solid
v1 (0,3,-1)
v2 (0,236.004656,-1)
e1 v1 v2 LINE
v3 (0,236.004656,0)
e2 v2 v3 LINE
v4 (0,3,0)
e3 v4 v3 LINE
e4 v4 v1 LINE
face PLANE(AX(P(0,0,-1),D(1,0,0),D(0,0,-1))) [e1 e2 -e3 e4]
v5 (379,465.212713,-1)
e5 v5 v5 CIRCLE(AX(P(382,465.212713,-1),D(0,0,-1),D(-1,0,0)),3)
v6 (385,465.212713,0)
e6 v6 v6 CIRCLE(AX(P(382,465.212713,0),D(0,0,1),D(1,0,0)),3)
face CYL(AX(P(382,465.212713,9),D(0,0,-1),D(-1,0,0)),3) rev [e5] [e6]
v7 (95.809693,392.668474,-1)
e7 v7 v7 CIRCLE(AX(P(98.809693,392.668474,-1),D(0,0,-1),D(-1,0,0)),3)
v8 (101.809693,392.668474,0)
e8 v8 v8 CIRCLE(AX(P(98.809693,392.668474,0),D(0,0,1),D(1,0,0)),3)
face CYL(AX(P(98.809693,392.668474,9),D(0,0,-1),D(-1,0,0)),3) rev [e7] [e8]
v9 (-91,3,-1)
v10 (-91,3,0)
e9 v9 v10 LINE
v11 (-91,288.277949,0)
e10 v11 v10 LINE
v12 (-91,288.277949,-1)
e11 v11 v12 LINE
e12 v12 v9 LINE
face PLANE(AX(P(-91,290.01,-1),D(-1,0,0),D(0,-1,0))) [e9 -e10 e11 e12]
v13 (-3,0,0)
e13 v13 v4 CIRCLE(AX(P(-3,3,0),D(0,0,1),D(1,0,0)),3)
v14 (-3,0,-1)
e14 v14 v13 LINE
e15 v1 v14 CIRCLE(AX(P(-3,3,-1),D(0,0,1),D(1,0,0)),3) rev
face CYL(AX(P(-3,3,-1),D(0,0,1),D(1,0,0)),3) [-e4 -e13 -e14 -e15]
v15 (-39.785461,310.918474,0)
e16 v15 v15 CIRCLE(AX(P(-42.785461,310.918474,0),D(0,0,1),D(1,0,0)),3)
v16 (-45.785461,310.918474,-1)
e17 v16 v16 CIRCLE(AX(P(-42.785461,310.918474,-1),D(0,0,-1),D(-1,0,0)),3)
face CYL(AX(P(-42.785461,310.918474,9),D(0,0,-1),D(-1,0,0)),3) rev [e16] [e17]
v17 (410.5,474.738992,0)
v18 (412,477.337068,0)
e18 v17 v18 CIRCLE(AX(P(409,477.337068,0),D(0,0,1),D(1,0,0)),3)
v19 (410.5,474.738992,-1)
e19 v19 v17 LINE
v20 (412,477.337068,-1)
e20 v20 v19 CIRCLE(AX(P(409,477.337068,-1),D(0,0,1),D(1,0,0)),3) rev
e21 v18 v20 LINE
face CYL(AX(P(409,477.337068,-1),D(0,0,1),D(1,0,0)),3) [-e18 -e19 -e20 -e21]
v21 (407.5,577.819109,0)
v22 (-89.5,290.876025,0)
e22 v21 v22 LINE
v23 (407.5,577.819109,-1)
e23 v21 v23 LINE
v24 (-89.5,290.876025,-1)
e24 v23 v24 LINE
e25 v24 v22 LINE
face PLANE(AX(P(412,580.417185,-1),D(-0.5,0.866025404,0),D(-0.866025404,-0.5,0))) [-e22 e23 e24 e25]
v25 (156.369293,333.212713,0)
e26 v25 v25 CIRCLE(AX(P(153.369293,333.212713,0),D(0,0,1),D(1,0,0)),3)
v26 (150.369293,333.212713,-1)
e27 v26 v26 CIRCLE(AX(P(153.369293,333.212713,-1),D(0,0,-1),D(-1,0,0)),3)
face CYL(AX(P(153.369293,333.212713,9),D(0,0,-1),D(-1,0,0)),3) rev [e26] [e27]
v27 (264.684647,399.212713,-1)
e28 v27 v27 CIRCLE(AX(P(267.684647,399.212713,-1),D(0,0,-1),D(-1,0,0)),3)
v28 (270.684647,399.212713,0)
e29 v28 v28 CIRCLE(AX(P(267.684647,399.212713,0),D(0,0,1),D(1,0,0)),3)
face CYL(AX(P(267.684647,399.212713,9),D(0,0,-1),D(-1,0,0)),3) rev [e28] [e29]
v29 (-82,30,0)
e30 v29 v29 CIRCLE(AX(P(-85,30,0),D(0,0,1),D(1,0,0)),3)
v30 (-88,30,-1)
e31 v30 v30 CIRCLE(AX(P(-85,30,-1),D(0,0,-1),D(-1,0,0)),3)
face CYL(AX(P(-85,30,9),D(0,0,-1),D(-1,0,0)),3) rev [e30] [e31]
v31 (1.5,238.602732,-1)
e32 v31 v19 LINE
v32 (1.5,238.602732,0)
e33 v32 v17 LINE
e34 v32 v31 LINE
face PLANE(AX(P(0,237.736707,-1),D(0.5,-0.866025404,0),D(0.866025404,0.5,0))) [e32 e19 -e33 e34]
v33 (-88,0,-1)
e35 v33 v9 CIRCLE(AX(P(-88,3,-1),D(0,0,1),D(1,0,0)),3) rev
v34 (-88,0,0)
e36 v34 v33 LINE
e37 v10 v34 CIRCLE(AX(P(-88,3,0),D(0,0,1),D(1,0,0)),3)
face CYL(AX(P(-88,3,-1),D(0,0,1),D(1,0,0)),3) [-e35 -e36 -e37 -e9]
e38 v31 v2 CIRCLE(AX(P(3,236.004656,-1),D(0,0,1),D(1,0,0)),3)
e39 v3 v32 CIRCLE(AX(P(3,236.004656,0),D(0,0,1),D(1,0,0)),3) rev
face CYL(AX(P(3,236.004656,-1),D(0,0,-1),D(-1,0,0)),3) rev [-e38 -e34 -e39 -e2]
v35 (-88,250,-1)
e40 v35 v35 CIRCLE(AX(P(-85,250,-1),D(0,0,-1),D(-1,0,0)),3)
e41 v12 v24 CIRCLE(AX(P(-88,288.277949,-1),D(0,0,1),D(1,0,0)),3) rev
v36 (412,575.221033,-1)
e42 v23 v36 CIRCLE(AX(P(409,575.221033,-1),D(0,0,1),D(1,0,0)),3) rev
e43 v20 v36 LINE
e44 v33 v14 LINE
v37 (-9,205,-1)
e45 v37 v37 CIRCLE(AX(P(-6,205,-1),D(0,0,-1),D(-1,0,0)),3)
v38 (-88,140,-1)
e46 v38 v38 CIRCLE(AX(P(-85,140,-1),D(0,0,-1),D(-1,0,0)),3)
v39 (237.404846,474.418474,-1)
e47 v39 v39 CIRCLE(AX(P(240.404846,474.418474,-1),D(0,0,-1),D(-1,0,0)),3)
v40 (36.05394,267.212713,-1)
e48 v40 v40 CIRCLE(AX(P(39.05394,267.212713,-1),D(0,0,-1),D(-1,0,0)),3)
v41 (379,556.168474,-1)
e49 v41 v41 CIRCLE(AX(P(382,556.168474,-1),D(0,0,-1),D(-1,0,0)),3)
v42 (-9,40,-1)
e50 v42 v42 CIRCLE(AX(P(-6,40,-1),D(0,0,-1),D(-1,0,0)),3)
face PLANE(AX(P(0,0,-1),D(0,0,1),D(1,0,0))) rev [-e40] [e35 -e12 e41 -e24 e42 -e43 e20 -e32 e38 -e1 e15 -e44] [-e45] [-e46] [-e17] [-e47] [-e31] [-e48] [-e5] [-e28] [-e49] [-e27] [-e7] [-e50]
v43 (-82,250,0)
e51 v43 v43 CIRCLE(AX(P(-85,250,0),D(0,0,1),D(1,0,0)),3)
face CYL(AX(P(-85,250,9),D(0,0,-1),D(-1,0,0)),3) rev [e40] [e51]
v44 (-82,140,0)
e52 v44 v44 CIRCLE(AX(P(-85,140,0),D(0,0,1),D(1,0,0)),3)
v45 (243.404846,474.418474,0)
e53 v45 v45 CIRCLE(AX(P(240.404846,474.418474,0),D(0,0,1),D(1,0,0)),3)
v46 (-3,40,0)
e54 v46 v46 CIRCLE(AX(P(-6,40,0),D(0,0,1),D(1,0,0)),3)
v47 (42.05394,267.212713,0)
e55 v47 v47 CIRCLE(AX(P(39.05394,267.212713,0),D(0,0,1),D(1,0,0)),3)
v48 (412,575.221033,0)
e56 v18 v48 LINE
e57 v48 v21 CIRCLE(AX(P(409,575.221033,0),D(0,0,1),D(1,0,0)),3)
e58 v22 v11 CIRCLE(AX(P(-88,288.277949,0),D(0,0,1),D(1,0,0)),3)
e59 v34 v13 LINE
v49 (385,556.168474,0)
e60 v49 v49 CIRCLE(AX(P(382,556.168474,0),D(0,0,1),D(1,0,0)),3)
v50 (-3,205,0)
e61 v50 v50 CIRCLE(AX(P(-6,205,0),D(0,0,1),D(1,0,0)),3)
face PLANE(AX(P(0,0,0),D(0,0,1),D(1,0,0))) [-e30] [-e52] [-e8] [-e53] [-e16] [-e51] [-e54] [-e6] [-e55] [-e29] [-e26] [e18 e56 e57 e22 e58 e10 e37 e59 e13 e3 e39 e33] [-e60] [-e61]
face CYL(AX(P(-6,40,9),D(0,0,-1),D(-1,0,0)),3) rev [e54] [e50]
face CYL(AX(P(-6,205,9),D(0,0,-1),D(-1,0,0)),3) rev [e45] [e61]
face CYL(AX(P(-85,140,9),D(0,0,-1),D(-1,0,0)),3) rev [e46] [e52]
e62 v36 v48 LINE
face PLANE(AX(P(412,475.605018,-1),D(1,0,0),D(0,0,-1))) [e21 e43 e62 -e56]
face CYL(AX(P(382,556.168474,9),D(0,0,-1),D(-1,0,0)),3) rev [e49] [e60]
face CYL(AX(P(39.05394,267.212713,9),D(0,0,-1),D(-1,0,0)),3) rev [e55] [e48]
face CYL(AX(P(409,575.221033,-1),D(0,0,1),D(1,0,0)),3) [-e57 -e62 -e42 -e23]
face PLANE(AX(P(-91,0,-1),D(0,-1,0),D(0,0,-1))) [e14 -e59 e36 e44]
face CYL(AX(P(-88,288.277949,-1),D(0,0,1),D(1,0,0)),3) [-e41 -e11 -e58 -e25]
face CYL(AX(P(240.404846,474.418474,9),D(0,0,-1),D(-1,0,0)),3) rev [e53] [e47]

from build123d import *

# Parameters (mm, degrees)
BASE_FLANGE1_DEPTH = 1
FILLET1_R          = 3
SKETCH2_R          = 3
CUT_EXTRUDE1_DEPTH = 10


# Sheet-metal steps are written as plain solids
with BuildPart() as part:
    # Sketch1 → Base-Flange1 (new body)
    with BuildSketch(Plane.XY):
        Polygon((0, 0), (0, 237.736706628), (412, 475.605017534), (412, 580.417185402), (-91, 290.01), (-91, 0), align=None)
    extrude(amount=-BASE_FLANGE1_DEPTH)

    # Fillet1
    fillet1_edges = [part.edges().sort_by_distance(p)[0] for p in [
        (-91, 0, -0.5),
        (-91, 290.01, -0.5),
        (412, 580.417185402, -0.5),
        (412, 475.605017534, -0.5),
        (0, 237.736706628, -0.5),
        (0, 0, -0.5),
    ]]
    fillet(fillet1_edges, radius=FILLET1_R)

    # Sketch2 → Cut-Extrude1 (cut)
    with BuildSketch(Plane(origin=(0, 0, -1), x_dir=(-1, 0, 0), z_dir=(0, 0, -1))):
        with Locations((-382, 556.168474096)):
            Circle(SKETCH2_R)
        with Locations((-240.404846481, 474.418474096)):
            Circle(SKETCH2_R)
        with Locations((-98.809692962, 392.668474096)):
            Circle(SKETCH2_R)
        with Locations((42.785460556, 310.918474096)):
            Circle(SKETCH2_R)
        with Locations((-382, 465.212712688)):
            Circle(SKETCH2_R)
        with Locations((-267.6846467, 399.212712688)):
            Circle(SKETCH2_R)
        with Locations((-153.369293401, 333.212712688)):
            Circle(SKETCH2_R)
        with Locations((-39.053940101, 267.212712688)):
            Circle(SKETCH2_R)
        with Locations((85, 30)):
            Circle(SKETCH2_R)
        with Locations((6, 40)):
            Circle(SKETCH2_R)
        with Locations((85, 140)):
            Circle(SKETCH2_R)
        with Locations((85, 250)):
            Circle(SKETCH2_R)
        with Locations((6, 205)):
            Circle(SKETCH2_R)
    extrude(amount=-CUT_EXTRUDE1_DEPTH, mode=Mode.SUBTRACT)


solid = part.part
